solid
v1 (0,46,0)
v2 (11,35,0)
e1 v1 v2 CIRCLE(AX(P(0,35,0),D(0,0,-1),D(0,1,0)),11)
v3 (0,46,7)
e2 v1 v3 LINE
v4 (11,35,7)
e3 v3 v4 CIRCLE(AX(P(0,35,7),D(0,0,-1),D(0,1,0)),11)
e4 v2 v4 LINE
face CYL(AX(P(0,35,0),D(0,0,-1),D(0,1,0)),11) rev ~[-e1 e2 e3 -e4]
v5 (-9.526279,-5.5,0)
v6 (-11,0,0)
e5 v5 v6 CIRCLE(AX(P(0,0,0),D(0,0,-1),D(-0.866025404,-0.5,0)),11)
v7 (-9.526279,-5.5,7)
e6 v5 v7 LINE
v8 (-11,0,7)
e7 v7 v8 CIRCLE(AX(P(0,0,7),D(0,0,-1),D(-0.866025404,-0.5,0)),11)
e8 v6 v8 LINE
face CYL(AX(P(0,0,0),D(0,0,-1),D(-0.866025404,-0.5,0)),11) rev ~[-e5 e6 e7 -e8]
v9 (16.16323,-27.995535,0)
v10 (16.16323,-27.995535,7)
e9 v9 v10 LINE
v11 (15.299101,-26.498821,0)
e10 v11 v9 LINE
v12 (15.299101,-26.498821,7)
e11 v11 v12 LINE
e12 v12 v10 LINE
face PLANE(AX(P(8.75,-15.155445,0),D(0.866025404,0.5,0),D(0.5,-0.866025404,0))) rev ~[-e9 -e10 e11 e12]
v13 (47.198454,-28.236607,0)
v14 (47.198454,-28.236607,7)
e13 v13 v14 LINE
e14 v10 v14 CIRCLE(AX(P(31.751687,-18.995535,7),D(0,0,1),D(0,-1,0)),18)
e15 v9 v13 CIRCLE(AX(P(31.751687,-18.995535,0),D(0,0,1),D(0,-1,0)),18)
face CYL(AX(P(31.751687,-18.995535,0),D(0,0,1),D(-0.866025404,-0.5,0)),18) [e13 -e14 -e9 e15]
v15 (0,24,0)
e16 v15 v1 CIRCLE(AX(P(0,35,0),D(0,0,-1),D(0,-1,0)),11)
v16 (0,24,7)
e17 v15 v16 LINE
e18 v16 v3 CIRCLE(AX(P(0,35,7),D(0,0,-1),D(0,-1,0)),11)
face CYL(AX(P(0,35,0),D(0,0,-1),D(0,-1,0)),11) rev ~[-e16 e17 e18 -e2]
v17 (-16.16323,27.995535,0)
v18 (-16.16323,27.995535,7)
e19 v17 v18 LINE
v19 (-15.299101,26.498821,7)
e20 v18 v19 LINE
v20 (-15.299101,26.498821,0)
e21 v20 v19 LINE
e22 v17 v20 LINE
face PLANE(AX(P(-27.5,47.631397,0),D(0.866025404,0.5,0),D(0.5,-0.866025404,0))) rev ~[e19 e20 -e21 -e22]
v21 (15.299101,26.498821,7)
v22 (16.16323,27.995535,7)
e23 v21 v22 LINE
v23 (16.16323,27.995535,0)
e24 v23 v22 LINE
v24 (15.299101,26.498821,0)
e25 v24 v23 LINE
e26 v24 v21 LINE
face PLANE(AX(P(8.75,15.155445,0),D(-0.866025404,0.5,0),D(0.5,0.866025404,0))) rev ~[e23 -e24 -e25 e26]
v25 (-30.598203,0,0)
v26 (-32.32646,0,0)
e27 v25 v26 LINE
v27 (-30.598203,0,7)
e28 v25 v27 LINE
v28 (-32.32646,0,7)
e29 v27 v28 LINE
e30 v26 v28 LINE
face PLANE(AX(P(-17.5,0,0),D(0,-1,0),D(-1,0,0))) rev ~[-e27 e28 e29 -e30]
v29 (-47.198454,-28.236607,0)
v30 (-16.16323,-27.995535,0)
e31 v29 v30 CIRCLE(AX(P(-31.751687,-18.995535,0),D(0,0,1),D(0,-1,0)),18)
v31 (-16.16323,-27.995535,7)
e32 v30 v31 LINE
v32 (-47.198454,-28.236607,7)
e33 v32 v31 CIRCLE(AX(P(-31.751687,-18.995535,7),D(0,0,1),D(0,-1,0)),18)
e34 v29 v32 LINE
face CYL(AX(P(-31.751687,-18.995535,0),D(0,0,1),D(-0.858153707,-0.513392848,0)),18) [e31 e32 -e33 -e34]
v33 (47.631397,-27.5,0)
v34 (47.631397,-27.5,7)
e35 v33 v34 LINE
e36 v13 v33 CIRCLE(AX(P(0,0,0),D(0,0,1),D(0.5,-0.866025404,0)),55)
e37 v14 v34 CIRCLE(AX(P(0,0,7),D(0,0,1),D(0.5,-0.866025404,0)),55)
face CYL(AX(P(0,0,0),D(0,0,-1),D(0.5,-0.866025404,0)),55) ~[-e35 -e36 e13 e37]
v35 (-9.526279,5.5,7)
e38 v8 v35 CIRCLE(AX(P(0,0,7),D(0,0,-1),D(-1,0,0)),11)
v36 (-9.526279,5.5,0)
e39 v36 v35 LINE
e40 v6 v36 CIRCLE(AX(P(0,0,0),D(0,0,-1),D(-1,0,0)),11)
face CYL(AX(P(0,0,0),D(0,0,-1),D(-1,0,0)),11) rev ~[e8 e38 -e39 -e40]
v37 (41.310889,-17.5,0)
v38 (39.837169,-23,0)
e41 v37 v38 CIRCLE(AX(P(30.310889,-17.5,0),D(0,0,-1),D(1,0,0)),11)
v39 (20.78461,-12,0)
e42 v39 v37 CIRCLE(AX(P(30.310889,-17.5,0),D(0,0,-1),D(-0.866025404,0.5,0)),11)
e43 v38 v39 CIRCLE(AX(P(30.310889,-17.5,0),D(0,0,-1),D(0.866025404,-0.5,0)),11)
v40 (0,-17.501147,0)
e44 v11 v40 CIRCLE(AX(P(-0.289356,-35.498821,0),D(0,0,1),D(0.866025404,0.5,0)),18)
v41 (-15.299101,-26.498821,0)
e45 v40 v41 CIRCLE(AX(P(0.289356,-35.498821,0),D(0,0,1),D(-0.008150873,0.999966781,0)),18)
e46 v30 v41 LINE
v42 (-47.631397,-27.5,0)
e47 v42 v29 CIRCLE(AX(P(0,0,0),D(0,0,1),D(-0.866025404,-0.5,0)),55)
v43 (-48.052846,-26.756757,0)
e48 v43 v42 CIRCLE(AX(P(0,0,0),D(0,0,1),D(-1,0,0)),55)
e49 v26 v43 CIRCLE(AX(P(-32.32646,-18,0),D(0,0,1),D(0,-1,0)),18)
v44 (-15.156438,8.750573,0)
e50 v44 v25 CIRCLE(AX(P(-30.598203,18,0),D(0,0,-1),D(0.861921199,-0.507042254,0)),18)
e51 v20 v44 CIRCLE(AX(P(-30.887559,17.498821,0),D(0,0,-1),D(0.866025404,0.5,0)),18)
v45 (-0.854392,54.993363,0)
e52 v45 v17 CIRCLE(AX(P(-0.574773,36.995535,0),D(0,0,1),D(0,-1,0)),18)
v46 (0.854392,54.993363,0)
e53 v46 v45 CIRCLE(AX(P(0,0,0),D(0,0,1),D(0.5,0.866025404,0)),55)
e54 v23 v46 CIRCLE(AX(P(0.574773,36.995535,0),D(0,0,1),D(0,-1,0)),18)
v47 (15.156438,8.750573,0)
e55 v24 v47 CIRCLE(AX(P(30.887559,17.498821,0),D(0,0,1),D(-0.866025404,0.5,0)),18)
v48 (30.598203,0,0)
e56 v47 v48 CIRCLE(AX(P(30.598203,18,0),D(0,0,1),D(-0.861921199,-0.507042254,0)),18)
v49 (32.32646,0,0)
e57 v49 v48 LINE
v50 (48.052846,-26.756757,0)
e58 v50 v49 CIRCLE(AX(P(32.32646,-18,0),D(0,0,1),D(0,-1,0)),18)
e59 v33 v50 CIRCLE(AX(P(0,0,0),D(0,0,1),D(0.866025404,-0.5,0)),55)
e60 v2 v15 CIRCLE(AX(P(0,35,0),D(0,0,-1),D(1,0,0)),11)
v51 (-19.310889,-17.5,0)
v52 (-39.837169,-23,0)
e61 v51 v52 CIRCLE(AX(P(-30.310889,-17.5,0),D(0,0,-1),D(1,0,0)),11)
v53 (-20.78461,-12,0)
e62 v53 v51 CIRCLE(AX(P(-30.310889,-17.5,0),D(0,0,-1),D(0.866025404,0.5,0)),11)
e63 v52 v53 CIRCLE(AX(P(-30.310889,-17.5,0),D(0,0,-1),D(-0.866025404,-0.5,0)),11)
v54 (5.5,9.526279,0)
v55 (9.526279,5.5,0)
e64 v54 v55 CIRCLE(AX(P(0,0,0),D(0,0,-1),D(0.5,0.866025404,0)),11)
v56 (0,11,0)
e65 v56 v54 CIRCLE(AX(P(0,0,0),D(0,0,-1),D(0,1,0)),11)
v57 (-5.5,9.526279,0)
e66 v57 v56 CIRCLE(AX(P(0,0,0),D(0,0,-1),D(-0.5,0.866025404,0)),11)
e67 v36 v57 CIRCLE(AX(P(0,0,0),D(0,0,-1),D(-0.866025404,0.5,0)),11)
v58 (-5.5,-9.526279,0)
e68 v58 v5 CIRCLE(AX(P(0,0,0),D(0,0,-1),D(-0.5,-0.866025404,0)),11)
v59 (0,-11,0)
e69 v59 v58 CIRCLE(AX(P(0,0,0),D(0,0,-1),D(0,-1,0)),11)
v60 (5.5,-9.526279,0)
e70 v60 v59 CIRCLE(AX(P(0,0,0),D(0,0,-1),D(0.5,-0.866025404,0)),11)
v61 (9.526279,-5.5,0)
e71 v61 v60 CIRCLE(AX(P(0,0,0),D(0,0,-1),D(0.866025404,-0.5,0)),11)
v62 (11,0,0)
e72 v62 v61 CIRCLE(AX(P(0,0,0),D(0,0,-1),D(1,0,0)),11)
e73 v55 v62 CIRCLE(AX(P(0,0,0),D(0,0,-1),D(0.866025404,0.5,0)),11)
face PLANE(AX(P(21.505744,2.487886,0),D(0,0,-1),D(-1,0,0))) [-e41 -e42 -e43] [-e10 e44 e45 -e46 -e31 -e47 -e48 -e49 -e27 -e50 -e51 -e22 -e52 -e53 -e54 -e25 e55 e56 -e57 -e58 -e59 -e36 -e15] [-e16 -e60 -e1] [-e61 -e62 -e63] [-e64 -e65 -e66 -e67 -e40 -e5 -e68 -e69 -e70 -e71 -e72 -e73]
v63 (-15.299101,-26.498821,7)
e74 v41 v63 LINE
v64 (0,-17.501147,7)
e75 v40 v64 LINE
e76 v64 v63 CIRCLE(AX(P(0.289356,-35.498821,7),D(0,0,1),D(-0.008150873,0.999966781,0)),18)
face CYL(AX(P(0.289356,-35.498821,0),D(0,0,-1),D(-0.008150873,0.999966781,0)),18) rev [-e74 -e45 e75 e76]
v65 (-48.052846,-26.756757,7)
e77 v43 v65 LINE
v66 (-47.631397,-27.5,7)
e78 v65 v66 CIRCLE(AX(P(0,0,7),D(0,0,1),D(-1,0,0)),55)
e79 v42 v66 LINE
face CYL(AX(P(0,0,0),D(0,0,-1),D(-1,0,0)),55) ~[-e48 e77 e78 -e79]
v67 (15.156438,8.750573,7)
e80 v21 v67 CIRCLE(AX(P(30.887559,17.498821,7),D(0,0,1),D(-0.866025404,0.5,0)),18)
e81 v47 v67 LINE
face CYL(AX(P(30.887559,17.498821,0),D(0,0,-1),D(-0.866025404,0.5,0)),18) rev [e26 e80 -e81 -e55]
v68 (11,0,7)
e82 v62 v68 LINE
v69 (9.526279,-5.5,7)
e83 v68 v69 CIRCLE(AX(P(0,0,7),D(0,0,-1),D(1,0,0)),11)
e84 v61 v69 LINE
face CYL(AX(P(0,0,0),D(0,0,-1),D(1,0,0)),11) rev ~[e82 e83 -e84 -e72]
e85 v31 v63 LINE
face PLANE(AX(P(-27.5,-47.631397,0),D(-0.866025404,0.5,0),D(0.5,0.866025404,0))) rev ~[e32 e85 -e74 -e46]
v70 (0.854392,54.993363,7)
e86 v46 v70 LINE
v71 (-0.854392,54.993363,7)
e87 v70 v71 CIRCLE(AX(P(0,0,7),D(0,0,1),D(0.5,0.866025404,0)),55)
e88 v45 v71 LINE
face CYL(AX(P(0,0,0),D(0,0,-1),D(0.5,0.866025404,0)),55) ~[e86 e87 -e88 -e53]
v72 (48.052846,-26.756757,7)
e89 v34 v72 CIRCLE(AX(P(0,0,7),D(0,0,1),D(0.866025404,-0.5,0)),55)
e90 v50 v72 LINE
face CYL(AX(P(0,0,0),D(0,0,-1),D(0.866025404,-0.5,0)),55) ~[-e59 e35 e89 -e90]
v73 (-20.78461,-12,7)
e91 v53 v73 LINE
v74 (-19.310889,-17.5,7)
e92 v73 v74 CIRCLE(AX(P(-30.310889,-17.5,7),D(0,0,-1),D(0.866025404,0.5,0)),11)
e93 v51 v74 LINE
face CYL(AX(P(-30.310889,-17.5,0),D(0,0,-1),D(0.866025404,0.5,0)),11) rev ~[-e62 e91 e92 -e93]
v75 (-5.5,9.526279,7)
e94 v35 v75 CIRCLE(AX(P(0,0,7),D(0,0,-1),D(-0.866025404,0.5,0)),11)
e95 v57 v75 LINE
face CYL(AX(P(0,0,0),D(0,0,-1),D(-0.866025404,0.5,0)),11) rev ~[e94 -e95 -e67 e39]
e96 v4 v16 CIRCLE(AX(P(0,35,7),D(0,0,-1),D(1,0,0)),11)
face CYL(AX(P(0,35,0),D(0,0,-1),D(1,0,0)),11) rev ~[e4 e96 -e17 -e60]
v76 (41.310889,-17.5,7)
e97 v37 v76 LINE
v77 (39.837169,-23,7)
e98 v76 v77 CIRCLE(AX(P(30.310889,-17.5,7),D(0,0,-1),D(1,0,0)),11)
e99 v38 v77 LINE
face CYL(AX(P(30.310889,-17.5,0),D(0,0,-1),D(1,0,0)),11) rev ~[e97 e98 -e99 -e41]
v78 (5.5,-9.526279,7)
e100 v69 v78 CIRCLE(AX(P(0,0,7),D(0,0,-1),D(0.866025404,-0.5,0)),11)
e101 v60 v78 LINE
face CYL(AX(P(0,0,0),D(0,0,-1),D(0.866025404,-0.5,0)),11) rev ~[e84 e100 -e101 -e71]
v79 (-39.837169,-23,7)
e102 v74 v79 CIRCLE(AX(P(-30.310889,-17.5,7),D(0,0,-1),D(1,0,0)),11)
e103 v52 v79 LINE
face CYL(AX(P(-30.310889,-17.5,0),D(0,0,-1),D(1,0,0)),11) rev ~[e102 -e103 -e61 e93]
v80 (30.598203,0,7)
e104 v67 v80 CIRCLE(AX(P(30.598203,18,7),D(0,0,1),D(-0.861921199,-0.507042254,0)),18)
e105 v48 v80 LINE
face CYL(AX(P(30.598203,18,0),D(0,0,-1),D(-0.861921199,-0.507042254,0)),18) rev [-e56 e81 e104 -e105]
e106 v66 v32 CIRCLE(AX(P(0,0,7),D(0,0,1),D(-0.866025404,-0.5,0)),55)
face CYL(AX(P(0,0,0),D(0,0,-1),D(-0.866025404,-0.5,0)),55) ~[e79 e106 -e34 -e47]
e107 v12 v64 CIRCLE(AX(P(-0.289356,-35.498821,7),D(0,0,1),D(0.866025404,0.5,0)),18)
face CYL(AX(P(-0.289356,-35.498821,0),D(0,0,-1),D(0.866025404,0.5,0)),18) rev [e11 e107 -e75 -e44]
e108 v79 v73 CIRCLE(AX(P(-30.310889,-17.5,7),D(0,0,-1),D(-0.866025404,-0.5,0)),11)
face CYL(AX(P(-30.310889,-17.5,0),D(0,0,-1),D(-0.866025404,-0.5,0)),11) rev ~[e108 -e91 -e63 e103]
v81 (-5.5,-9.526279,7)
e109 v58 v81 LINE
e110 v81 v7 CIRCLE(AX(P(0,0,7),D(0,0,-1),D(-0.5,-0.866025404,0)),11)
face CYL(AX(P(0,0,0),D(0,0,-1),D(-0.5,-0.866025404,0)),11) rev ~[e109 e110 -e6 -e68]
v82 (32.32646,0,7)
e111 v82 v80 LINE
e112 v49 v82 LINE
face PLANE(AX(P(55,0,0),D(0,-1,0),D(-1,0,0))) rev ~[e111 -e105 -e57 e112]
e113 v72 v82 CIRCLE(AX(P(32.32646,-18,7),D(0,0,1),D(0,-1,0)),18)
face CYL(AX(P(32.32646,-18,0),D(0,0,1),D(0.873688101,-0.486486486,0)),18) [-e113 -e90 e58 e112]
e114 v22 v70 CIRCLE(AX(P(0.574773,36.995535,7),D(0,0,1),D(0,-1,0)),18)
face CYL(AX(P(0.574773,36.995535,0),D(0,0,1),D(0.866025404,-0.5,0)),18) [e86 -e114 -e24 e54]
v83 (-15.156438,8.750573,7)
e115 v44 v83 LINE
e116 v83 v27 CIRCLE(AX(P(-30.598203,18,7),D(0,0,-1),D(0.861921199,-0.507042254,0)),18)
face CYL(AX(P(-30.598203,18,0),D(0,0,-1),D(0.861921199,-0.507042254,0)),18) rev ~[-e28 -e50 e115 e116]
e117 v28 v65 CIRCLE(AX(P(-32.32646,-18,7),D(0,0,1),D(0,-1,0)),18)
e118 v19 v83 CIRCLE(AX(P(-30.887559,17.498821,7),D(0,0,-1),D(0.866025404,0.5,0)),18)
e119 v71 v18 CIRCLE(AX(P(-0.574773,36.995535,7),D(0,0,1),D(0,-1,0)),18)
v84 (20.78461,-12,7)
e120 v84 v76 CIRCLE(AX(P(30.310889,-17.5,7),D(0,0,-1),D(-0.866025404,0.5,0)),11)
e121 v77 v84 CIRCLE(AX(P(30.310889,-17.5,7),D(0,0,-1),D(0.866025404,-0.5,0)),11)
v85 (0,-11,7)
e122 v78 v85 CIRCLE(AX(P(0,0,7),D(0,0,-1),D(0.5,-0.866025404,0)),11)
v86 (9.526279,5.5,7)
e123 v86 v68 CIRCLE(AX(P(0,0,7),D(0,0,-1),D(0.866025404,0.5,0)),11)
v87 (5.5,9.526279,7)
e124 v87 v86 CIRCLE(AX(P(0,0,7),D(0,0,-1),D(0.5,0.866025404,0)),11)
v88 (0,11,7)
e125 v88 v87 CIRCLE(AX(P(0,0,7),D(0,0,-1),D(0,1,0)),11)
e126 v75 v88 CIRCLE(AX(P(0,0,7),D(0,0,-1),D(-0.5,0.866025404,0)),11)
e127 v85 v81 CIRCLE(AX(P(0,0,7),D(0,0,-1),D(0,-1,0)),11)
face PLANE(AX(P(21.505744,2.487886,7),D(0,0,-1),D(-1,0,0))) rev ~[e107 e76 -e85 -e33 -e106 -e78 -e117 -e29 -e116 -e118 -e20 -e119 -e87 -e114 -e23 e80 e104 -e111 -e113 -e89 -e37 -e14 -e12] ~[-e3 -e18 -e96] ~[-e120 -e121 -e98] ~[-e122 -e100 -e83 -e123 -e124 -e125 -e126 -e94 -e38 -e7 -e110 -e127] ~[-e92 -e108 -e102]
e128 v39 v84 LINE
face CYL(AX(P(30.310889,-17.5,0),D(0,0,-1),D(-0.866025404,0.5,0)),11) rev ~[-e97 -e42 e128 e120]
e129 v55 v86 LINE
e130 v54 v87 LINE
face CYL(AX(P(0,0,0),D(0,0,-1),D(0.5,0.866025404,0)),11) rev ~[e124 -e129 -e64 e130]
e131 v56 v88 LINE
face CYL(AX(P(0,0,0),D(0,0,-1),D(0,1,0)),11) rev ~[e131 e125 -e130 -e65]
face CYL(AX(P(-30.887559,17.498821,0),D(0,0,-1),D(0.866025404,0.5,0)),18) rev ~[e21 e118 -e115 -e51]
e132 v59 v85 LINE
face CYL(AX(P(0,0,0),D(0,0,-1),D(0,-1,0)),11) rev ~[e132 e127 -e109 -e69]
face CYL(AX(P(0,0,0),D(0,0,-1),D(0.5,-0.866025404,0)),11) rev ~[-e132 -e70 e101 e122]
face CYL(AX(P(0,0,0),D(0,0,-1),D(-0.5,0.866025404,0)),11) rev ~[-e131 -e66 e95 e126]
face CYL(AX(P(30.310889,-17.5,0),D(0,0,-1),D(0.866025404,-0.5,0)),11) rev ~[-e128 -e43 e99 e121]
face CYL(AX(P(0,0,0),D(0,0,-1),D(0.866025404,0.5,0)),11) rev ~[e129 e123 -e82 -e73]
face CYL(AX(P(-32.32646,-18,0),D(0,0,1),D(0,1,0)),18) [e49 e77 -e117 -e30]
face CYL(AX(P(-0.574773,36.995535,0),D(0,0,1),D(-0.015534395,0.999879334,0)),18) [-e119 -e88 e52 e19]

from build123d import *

# Parameters (mm, degrees)
F1_DEPTH    = 7
F2_R        = 18
F3_T1_DEPTH = 7


# Not quite as in the source:
# - a fillet or chamfer that OpenCascade refuses, or shapes differently, is made with other operations: its cross-section is extruded or revolved along the edge and cut away or added


with BuildPart() as f1:
    # F0 (on Top) → F1 (new body)
    with BuildSketch(Plane.XY):
        with BuildLine():
            ThreePointArc((9.5262794416, 5.5), (10.6251840892, 2.8470094961), (11, 0))
            Line((11, 0), (15, 0))
            ThreePointArc((15, 0), (14.4888873943, 3.8822856765), (12.9903810568, 7.5))
            Line((12.9903810568, 7.5), (9.5262794416, 5.5))
        make_face()
        with BuildLine():
            ThreePointArc((5.5, 9.5262794416), (7.7781745931, 7.7781745931), (9.5262794416, 5.5))
            Line((9.5262794416, 5.5), (12.9903810568, 7.5))
            ThreePointArc((12.9903810568, 7.5), (10.6066017178, 10.6066017178), (7.5, 12.9903810568))
            Line((7.5, 12.9903810568), (5.5, 9.5262794416))
        make_face()
        with BuildLine():
            ThreePointArc((0, 11), (2.8470094961, 10.6251840892), (5.5, 9.5262794416))
            Line((5.5, 9.5262794416), (7.5, 12.9903810568))
            ThreePointArc((7.5, 12.9903810568), (3.8822856765, 14.4888873943), (0, 15))
            Line((0, 15), (0, 11))
        make_face()
        with BuildLine():
            ThreePointArc((-5.5, 9.5262794416), (-2.8470094961, 10.6251840892), (0, 11))
            Line((0, 11), (0, 15))
            ThreePointArc((0, 15), (-3.8822856765, 14.4888873943), (-7.5, 12.9903810568))
            Line((-7.5, 12.9903810568), (-5.5, 9.5262794416))
        make_face()
        with BuildLine():
            ThreePointArc((-9.5262794416, 5.5), (-7.7781745931, 7.7781745931), (-5.5, 9.5262794416))
            Line((-5.5, 9.5262794416), (-7.5, 12.9903810568))
            ThreePointArc((-7.5, 12.9903810568), (-10.6066017178, 10.6066017178), (-12.9903810568, 7.5))
            Line((-12.9903810568, 7.5), (-9.5262794416, 5.5))
        make_face()
        with BuildLine():
            ThreePointArc((-11, 0), (-10.6251840892, 2.8470094961), (-9.5262794416, 5.5))
            Line((-9.5262794416, 5.5), (-12.9903810568, 7.5))
            ThreePointArc((-12.9903810568, 7.5), (-14.4888873943, 3.8822856765), (-15, 0))
            Line((-15, 0), (-11, 0))
        make_face()
        with BuildLine():
            Line((-12.9903810568, -7.5), (-9.5262794416, -5.5))
            ThreePointArc((-9.5262794416, -5.5), (-10.6251840892, -2.8470094961), (-11, 0))
            Line((-11, 0), (-15, 0))
            ThreePointArc((-15, 0), (-14.4888873943, -3.8822856765), (-12.9903810568, -7.5))
        make_face()
        with BuildLine():
            Line((-7.5, -12.9903810568), (-5.5, -9.5262794416))
            ThreePointArc((-5.5, -9.5262794416), (-7.7781745931, -7.7781745931), (-9.5262794416, -5.5))
            Line((-9.5262794416, -5.5), (-12.9903810568, -7.5))
            ThreePointArc((-12.9903810568, -7.5), (-10.6066017178, -10.6066017178), (-7.5, -12.9903810568))
        make_face()
        with BuildLine():
            Line((0, -15), (0, -11))
            ThreePointArc((0, -11), (-2.8470094961, -10.6251840892), (-5.5, -9.5262794416))
            Line((-5.5, -9.5262794416), (-7.5, -12.9903810568))
            ThreePointArc((-7.5, -12.9903810568), (-3.8822856765, -14.4888873943), (0, -15))
        make_face()
        with BuildLine():
            Line((7.5, -12.9903810568), (5.5, -9.5262794416))
            ThreePointArc((5.5, -9.5262794416), (2.8470094961, -10.6251840892), (0, -11))
            Line((0, -11), (0, -15))
            ThreePointArc((0, -15), (3.8822856765, -14.4888873943), (7.5, -12.9903810568))
        make_face()
        with BuildLine():
            Line((12.9903810568, -7.5), (9.5262794416, -5.5))
            ThreePointArc((9.5262794416, -5.5), (7.7781745931, -7.7781745931), (5.5, -9.5262794416))
            Line((5.5, -9.5262794416), (7.5, -12.9903810568))
            ThreePointArc((7.5, -12.9903810568), (10.6066017178, -10.6066017178), (12.9903810568, -7.5))
        make_face()
        with BuildLine():
            Line((15, 0), (11, 0))
            ThreePointArc((11, 0), (10.6251840892, -2.8470094961), (9.5262794416, -5.5))
            Line((9.5262794416, -5.5), (12.9903810568, -7.5))
            ThreePointArc((12.9903810568, -7.5), (14.4888873943, -3.8822856765), (15, 0))
        make_face()
        with BuildLine():
            Line((-8.75, -15.1554445662), (-7.5, -12.9903810568))
            ThreePointArc((-7.5, -12.9903810568), (-10.6066017178, -10.6066017178), (-12.9903810568, -7.5))
            Line((-12.9903810568, -7.5), (-15.1554445662, -8.75))
            ThreePointArc((-15.1554445662, -8.75), (-12.3743686708, -12.3743686708), (-8.75, -15.1554445662))
        make_face()
        with BuildLine():
            ThreePointArc((-7.5, 12.9903810568), (-3.8822856765, 14.4888873943), (0, 15))
            Line((0, 15), (0, 17.5))
            ThreePointArc((0, 17.5), (-4.5293332893, 16.9037019601), (-8.75, 15.1554445662))
            Line((-8.75, 15.1554445662), (-7.5, 12.9903810568))
        make_face()
        with BuildLine():
            ThreePointArc((0, 15), (3.8822856765, 14.4888873943), (7.5, 12.9903810568))
            Line((7.5, 12.9903810568), (8.75, 15.1554445662))
            ThreePointArc((8.75, 15.1554445662), (4.5293332893, 16.9037019601), (0, 17.5))
            Line((0, 17.5), (0, 15))
        make_face()
        with BuildLine():
            Line((-15.1554445662, -8.75), (-12.9903810568, -7.5))
            ThreePointArc((-12.9903810568, -7.5), (-14.4888873943, -3.8822856765), (-15, 0))
            Line((-15, 0), (-17.5, 0))
            ThreePointArc((-17.5, 0), (-16.9037019601, -4.5293332893), (-15.1554445662, -8.75))
        make_face()
        with BuildLine():
            Line((17.5, 0), (15, 0))
            ThreePointArc((15, 0), (14.4888873943, -3.8822856765), (12.9903810568, -7.5))
            Line((12.9903810568, -7.5), (15.1554445662, -8.75))
            ThreePointArc((15.1554445662, -8.75), (16.9037019601, -4.5293332893), (17.5, 0))
        make_face()
        with BuildLine():
            Line((15.1554445662, -8.75), (12.9903810568, -7.5))
            ThreePointArc((12.9903810568, -7.5), (10.6066017178, -10.6066017178), (7.5, -12.9903810568))
            Line((7.5, -12.9903810568), (8.75, -15.1554445662))
            ThreePointArc((8.75, -15.1554445662), (12.3743686708, -12.3743686708), (15.1554445662, -8.75))
        make_face()
        with BuildLine():
            Line((-20.7846096908, -12), (-17.3205080757, -10))
            ThreePointArc((-17.3205080757, -10), (-37.8108891325, -4.5096189432), (-43.3012701892, -25))
            Line((-43.3012701892, -25), (-39.8371685741, -23))
            ThreePointArc((-39.8371685741, -23), (-35.8108891325, -7.9737205584), (-20.7846096908, -12))
        make_face()
        with BuildLine():
            ThreePointArc((45.3108891325, -17.5), (34.193174809, -3.0111126057), (17.3205080757, -10))
            Line((17.3205080757, -10), (20.7846096908, -12))
            ThreePointArc((20.7846096908, -12), (33.1578986286, -6.8748159108), (41.3108891325, -17.5))
            ThreePointArc((41.3108891325, -17.5), (40.9360732216, -20.3470094961), (39.8371685741, -23))
            Line((39.8371685741, -23), (43.3012701892, -25))
            ThreePointArc((43.3012701892, -25), (44.7997765268, -21.3822856765), (45.3108891325, -17.5))
        make_face()
        with BuildLine():
            Line((20.7846096908, -12), (17.3205080757, -10))
            ThreePointArc((17.3205080757, -10), (22.8108891325, -30.4903810568), (43.3012701892, -25))
            Line((43.3012701892, -25), (39.8371685741, -23))
            ThreePointArc((39.8371685741, -23), (24.8108891325, -27.0262794416), (20.7846096908, -12))
        make_face()
        with BuildLine():
            ThreePointArc((0, 50), (-15, 35), (0, 20))
            Line((0, 20), (0, 24))
            ThreePointArc((0, 24), (-11, 35), (0, 46))
            Line((0, 46), (0, 50))
        make_face()
        with BuildLine():
            Line((0, 24), (0, 20))
            ThreePointArc((0, 20), (10.6066017178, 24.3933982822), (15, 35))
            ThreePointArc((15, 35), (10.6066017178, 45.6066017178), (0, 50))
            Line((0, 50), (0, 46))
            ThreePointArc((0, 46), (7.7781745931, 42.7781745931), (11, 35))
            ThreePointArc((11, 35), (7.7781745931, 27.2218254069), (0, 24))
        make_face()
        with BuildLine():
            ThreePointArc((-15.3108891325, -17.5), (-15.8220017381, -13.6177143235), (-17.3205080757, -10))
            Line((-17.3205080757, -10), (-20.7846096908, -12))
            ThreePointArc((-20.7846096908, -12), (-19.6857050433, -14.6529905039), (-19.3108891325, -17.5))
            ThreePointArc((-19.3108891325, -17.5), (-27.4638796363, -28.1251840892), (-39.8371685741, -23))
            Line((-39.8371685741, -23), (-43.3012701892, -25))
            ThreePointArc((-43.3012701892, -25), (-26.4286034559, -31.9888873943), (-15.3108891325, -17.5))
        make_face()
        with BuildLine():
            ThreePointArc((-8.75, 15.1554445662), (-4.5293332893, 16.9037019601), (0, 17.5))
            Line((0, 17.5), (0, 20))
            ThreePointArc((0, 20), (-15, 35), (0, 50))
            Line((0, 50), (0, 55))
            ThreePointArc((0, 55), (-14.2350474806, 53.1259204459), (-27.5, 47.6313972081))
            Line((-27.5, 47.6313972081), (-8.75, 15.1554445662))
        make_face()
        with BuildLine():
            ThreePointArc((-12.9903810568, 7.5), (-10.6066017178, 10.6066017178), (-7.5, 12.9903810568))
            Line((-7.5, 12.9903810568), (-8.75, 15.1554445662))
            ThreePointArc((-8.75, 15.1554445662), (-12.3743686708, 12.3743686708), (-15.1554445662, 8.75))
            Line((-15.1554445662, 8.75), (-12.9903810568, 7.5))
        make_face()
        with BuildLine():
            Line((-17.3205080757, -10), (-15.1554445662, -8.75))
            ThreePointArc((-15.1554445662, -8.75), (-16.9037019601, -4.5293332893), (-17.5, 0))
            Line((-17.5, 0), (-55, 0))
            ThreePointArc((-55, 0), (-53.1259204459, -14.2350474806), (-47.6313972081, -27.5))
            Line((-47.6313972081, -27.5), (-43.3012701892, -25))
            ThreePointArc((-43.3012701892, -25), (-37.8108891325, -4.5096189432), (-17.3205080757, -10))
        make_face()
        with BuildLine():
            Line((-27.5, -47.6313972081), (-8.75, -15.1554445662))
            ThreePointArc((-8.75, -15.1554445662), (-12.3743686708, -12.3743686708), (-15.1554445662, -8.75))
            Line((-15.1554445662, -8.75), (-17.3205080757, -10))
            ThreePointArc((-17.3205080757, -10), (-15.8220017381, -13.6177143235), (-15.3108891325, -17.5))
            ThreePointArc((-15.3108891325, -17.5), (-26.4286034559, -31.9888873943), (-43.3012701892, -25))
            Line((-43.3012701892, -25), (-47.6313972081, -27.5))
            ThreePointArc((-47.6313972081, -27.5), (-38.8908729653, -38.8908729653), (-27.5, -47.6313972081))
        make_face()
        with BuildLine():
            Line((0, -17.5), (0, -15))
            ThreePointArc((0, -15), (-3.8822856765, -14.4888873943), (-7.5, -12.9903810568))
            Line((-7.5, -12.9903810568), (-8.75, -15.1554445662))
            ThreePointArc((-8.75, -15.1554445662), (-4.5293332893, -16.9037019601), (0, -17.5))
        make_face()
        with BuildLine():
            Line((8.75, -15.1554445662), (7.5, -12.9903810568))
            ThreePointArc((7.5, -12.9903810568), (3.8822856765, -14.4888873943), (0, -15))
            Line((0, -15), (0, -17.5))
            ThreePointArc((0, -17.5), (4.5293332893, -16.9037019601), (8.75, -15.1554445662))
        make_face()
        with BuildLine():
            Line((17.3205080757, -10), (15.1554445662, -8.75))
            ThreePointArc((15.1554445662, -8.75), (12.3743686708, -12.3743686708), (8.75, -15.1554445662))
            Line((8.75, -15.1554445662), (27.5, -47.6313972081))
            ThreePointArc((27.5, -47.6313972081), (38.8908729653, -38.8908729653), (47.6313972081, -27.5))
            Line((47.6313972081, -27.5), (43.3012701892, -25))
            ThreePointArc((43.3012701892, -25), (22.8108891325, -30.4903810568), (17.3205080757, -10))
        make_face()
        with BuildLine():
            ThreePointArc((-15, 0), (-14.4888873943, 3.8822856765), (-12.9903810568, 7.5))
            Line((-12.9903810568, 7.5), (-15.1554445662, 8.75))
            ThreePointArc((-15.1554445662, 8.75), (-16.9037019601, 4.5293332893), (-17.5, 0))
            Line((-17.5, 0), (-15, 0))
        make_face()
        with BuildLine():
            ThreePointArc((0, 17.5), (4.5293332893, 16.9037019601), (8.75, 15.1554445662))
            Line((8.75, 15.1554445662), (27.5, 47.6313972081))
            ThreePointArc((27.5, 47.6313972081), (14.2350474806, 53.1259204459), (0, 55))
            Line((0, 55), (0, 50))
            ThreePointArc((0, 50), (10.6066017178, 45.6066017178), (15, 35))
            ThreePointArc((15, 35), (10.6066017178, 24.3933982822), (0, 20))
            Line((0, 20), (0, 17.5))
        make_face()
        with BuildLine():
            Line((55, 0), (17.5, 0))
            ThreePointArc((17.5, 0), (16.9037019601, -4.5293332893), (15.1554445662, -8.75))
            Line((15.1554445662, -8.75), (17.3205080757, -10))
            ThreePointArc((17.3205080757, -10), (34.193174809, -3.0111126057), (45.3108891325, -17.5))
            ThreePointArc((45.3108891325, -17.5), (44.7997765268, -21.3822856765), (43.3012701892, -25))
            Line((43.3012701892, -25), (47.6313972081, -27.5))
            ThreePointArc((47.6313972081, -27.5), (53.1259204459, -14.2350474806), (55, 0))
        make_face()
        with BuildLine():
            ThreePointArc((7.5, 12.9903810568), (10.6066017178, 10.6066017178), (12.9903810568, 7.5))
            Line((12.9903810568, 7.5), (15.1554445662, 8.75))
            ThreePointArc((15.1554445662, 8.75), (12.3743686708, 12.3743686708), (8.75, 15.1554445662))
            Line((8.75, 15.1554445662), (7.5, 12.9903810568))
        make_face()
        with BuildLine():
            ThreePointArc((12.9903810568, 7.5), (14.4888873943, 3.8822856765), (15, 0))
            Line((15, 0), (17.5, 0))
            ThreePointArc((17.5, 0), (16.9037019601, 4.5293332893), (15.1554445662, 8.75))
            Line((15.1554445662, 8.75), (12.9903810568, 7.5))
        make_face()
    extrude(amount=F1_DEPTH)

    # F2
    f2_edges = [f1.edges().sort_by_distance(p)[0] for p in [
        (-27.5, -47.631397, 3.5),
        (27.5, -47.631397, 3.5),
        (55, 0, 3.5),
        (27.5, 47.631397, 3.5),
        (-55, 0, 3.5),
        (-27.5, 47.631397, 3.5),
    ]]
    fillet(f2_edges, radius=F2_R)

    # F3: fillet of radius 18 on 6 edges, made by hand

    # F3_s2 → F3_t1 (join)
    with BuildSketch(Plane.XY):
        with BuildLine():
            ThreePointArc((15.0836209811, 8.8732394366), (21.6618075989, 2.3749929577), (30.5982025616, 0))
            Line((30.5982025616, 0), (17.5, 0))
            ThreePointArc((17.5, 0), (16.8851024156, 4.5981862093), (15.0836209811, 8.8732394366))
        make_face()
        with BuildLine():
            ThreePointArc((15.2991012808, 26.4988207285), (12.8877080347, 17.5721791936), (15.2262612565, 8.6261792323))
            ThreePointArc((15.2262612565, 8.6261792323), (12.4246972764, 12.3238345327), (8.75, 15.1554445662))
            Line((8.75, 15.1554445662), (15.2991012808, 26.4988207285))
        make_face()
        with BuildLine():
            ThreePointArc((0.1426402754, -17.499418669), (-8.7740995642, -19.9471721514), (-15.2991012808, -26.4988207285))
            Line((-15.2991012808, -26.4988207285), (-8.75, -15.1554445662))
            ThreePointArc((-8.75, -15.1554445662), (-4.4604051392, -16.9220207421), (0.1426402754, -17.499418669))
        make_face()
        with BuildLine():
            ThreePointArc((15.2991012808, -26.4988207285), (8.7740995642, -19.9471721514), (-0.1426402754, -17.499418669))
            ThreePointArc((-0.1426402754, -17.499418669), (4.4604051392, -16.9220207421), (8.75, -15.1554445662))
            Line((8.75, -15.1554445662), (15.2991012808, -26.4988207285))
        make_face()
        with BuildLine():
            ThreePointArc((-15.2991012808, 26.4988207285), (-12.8877080347, 17.5721791936), (-15.2262612565, 8.6261792323))
            ThreePointArc((-15.2262612565, 8.6261792323), (-12.4246972764, 12.3238345327), (-8.75, 15.1554445662))
            Line((-8.75, 15.1554445662), (-15.2991012808, 26.4988207285))
        make_face()
        with BuildLine():
            ThreePointArc((-15.0836209811, 8.8732394366), (-21.6618075989, 2.3749929577), (-30.5982025616, 0))
            Line((-30.5982025616, 0), (-17.5, 0))
            ThreePointArc((-17.5, 0), (-16.8851024156, 4.5981862093), (-15.0836209811, 8.8732394366))
        make_face()
    extrude(amount=F3_T1_DEPTH)


solid = f1.part
